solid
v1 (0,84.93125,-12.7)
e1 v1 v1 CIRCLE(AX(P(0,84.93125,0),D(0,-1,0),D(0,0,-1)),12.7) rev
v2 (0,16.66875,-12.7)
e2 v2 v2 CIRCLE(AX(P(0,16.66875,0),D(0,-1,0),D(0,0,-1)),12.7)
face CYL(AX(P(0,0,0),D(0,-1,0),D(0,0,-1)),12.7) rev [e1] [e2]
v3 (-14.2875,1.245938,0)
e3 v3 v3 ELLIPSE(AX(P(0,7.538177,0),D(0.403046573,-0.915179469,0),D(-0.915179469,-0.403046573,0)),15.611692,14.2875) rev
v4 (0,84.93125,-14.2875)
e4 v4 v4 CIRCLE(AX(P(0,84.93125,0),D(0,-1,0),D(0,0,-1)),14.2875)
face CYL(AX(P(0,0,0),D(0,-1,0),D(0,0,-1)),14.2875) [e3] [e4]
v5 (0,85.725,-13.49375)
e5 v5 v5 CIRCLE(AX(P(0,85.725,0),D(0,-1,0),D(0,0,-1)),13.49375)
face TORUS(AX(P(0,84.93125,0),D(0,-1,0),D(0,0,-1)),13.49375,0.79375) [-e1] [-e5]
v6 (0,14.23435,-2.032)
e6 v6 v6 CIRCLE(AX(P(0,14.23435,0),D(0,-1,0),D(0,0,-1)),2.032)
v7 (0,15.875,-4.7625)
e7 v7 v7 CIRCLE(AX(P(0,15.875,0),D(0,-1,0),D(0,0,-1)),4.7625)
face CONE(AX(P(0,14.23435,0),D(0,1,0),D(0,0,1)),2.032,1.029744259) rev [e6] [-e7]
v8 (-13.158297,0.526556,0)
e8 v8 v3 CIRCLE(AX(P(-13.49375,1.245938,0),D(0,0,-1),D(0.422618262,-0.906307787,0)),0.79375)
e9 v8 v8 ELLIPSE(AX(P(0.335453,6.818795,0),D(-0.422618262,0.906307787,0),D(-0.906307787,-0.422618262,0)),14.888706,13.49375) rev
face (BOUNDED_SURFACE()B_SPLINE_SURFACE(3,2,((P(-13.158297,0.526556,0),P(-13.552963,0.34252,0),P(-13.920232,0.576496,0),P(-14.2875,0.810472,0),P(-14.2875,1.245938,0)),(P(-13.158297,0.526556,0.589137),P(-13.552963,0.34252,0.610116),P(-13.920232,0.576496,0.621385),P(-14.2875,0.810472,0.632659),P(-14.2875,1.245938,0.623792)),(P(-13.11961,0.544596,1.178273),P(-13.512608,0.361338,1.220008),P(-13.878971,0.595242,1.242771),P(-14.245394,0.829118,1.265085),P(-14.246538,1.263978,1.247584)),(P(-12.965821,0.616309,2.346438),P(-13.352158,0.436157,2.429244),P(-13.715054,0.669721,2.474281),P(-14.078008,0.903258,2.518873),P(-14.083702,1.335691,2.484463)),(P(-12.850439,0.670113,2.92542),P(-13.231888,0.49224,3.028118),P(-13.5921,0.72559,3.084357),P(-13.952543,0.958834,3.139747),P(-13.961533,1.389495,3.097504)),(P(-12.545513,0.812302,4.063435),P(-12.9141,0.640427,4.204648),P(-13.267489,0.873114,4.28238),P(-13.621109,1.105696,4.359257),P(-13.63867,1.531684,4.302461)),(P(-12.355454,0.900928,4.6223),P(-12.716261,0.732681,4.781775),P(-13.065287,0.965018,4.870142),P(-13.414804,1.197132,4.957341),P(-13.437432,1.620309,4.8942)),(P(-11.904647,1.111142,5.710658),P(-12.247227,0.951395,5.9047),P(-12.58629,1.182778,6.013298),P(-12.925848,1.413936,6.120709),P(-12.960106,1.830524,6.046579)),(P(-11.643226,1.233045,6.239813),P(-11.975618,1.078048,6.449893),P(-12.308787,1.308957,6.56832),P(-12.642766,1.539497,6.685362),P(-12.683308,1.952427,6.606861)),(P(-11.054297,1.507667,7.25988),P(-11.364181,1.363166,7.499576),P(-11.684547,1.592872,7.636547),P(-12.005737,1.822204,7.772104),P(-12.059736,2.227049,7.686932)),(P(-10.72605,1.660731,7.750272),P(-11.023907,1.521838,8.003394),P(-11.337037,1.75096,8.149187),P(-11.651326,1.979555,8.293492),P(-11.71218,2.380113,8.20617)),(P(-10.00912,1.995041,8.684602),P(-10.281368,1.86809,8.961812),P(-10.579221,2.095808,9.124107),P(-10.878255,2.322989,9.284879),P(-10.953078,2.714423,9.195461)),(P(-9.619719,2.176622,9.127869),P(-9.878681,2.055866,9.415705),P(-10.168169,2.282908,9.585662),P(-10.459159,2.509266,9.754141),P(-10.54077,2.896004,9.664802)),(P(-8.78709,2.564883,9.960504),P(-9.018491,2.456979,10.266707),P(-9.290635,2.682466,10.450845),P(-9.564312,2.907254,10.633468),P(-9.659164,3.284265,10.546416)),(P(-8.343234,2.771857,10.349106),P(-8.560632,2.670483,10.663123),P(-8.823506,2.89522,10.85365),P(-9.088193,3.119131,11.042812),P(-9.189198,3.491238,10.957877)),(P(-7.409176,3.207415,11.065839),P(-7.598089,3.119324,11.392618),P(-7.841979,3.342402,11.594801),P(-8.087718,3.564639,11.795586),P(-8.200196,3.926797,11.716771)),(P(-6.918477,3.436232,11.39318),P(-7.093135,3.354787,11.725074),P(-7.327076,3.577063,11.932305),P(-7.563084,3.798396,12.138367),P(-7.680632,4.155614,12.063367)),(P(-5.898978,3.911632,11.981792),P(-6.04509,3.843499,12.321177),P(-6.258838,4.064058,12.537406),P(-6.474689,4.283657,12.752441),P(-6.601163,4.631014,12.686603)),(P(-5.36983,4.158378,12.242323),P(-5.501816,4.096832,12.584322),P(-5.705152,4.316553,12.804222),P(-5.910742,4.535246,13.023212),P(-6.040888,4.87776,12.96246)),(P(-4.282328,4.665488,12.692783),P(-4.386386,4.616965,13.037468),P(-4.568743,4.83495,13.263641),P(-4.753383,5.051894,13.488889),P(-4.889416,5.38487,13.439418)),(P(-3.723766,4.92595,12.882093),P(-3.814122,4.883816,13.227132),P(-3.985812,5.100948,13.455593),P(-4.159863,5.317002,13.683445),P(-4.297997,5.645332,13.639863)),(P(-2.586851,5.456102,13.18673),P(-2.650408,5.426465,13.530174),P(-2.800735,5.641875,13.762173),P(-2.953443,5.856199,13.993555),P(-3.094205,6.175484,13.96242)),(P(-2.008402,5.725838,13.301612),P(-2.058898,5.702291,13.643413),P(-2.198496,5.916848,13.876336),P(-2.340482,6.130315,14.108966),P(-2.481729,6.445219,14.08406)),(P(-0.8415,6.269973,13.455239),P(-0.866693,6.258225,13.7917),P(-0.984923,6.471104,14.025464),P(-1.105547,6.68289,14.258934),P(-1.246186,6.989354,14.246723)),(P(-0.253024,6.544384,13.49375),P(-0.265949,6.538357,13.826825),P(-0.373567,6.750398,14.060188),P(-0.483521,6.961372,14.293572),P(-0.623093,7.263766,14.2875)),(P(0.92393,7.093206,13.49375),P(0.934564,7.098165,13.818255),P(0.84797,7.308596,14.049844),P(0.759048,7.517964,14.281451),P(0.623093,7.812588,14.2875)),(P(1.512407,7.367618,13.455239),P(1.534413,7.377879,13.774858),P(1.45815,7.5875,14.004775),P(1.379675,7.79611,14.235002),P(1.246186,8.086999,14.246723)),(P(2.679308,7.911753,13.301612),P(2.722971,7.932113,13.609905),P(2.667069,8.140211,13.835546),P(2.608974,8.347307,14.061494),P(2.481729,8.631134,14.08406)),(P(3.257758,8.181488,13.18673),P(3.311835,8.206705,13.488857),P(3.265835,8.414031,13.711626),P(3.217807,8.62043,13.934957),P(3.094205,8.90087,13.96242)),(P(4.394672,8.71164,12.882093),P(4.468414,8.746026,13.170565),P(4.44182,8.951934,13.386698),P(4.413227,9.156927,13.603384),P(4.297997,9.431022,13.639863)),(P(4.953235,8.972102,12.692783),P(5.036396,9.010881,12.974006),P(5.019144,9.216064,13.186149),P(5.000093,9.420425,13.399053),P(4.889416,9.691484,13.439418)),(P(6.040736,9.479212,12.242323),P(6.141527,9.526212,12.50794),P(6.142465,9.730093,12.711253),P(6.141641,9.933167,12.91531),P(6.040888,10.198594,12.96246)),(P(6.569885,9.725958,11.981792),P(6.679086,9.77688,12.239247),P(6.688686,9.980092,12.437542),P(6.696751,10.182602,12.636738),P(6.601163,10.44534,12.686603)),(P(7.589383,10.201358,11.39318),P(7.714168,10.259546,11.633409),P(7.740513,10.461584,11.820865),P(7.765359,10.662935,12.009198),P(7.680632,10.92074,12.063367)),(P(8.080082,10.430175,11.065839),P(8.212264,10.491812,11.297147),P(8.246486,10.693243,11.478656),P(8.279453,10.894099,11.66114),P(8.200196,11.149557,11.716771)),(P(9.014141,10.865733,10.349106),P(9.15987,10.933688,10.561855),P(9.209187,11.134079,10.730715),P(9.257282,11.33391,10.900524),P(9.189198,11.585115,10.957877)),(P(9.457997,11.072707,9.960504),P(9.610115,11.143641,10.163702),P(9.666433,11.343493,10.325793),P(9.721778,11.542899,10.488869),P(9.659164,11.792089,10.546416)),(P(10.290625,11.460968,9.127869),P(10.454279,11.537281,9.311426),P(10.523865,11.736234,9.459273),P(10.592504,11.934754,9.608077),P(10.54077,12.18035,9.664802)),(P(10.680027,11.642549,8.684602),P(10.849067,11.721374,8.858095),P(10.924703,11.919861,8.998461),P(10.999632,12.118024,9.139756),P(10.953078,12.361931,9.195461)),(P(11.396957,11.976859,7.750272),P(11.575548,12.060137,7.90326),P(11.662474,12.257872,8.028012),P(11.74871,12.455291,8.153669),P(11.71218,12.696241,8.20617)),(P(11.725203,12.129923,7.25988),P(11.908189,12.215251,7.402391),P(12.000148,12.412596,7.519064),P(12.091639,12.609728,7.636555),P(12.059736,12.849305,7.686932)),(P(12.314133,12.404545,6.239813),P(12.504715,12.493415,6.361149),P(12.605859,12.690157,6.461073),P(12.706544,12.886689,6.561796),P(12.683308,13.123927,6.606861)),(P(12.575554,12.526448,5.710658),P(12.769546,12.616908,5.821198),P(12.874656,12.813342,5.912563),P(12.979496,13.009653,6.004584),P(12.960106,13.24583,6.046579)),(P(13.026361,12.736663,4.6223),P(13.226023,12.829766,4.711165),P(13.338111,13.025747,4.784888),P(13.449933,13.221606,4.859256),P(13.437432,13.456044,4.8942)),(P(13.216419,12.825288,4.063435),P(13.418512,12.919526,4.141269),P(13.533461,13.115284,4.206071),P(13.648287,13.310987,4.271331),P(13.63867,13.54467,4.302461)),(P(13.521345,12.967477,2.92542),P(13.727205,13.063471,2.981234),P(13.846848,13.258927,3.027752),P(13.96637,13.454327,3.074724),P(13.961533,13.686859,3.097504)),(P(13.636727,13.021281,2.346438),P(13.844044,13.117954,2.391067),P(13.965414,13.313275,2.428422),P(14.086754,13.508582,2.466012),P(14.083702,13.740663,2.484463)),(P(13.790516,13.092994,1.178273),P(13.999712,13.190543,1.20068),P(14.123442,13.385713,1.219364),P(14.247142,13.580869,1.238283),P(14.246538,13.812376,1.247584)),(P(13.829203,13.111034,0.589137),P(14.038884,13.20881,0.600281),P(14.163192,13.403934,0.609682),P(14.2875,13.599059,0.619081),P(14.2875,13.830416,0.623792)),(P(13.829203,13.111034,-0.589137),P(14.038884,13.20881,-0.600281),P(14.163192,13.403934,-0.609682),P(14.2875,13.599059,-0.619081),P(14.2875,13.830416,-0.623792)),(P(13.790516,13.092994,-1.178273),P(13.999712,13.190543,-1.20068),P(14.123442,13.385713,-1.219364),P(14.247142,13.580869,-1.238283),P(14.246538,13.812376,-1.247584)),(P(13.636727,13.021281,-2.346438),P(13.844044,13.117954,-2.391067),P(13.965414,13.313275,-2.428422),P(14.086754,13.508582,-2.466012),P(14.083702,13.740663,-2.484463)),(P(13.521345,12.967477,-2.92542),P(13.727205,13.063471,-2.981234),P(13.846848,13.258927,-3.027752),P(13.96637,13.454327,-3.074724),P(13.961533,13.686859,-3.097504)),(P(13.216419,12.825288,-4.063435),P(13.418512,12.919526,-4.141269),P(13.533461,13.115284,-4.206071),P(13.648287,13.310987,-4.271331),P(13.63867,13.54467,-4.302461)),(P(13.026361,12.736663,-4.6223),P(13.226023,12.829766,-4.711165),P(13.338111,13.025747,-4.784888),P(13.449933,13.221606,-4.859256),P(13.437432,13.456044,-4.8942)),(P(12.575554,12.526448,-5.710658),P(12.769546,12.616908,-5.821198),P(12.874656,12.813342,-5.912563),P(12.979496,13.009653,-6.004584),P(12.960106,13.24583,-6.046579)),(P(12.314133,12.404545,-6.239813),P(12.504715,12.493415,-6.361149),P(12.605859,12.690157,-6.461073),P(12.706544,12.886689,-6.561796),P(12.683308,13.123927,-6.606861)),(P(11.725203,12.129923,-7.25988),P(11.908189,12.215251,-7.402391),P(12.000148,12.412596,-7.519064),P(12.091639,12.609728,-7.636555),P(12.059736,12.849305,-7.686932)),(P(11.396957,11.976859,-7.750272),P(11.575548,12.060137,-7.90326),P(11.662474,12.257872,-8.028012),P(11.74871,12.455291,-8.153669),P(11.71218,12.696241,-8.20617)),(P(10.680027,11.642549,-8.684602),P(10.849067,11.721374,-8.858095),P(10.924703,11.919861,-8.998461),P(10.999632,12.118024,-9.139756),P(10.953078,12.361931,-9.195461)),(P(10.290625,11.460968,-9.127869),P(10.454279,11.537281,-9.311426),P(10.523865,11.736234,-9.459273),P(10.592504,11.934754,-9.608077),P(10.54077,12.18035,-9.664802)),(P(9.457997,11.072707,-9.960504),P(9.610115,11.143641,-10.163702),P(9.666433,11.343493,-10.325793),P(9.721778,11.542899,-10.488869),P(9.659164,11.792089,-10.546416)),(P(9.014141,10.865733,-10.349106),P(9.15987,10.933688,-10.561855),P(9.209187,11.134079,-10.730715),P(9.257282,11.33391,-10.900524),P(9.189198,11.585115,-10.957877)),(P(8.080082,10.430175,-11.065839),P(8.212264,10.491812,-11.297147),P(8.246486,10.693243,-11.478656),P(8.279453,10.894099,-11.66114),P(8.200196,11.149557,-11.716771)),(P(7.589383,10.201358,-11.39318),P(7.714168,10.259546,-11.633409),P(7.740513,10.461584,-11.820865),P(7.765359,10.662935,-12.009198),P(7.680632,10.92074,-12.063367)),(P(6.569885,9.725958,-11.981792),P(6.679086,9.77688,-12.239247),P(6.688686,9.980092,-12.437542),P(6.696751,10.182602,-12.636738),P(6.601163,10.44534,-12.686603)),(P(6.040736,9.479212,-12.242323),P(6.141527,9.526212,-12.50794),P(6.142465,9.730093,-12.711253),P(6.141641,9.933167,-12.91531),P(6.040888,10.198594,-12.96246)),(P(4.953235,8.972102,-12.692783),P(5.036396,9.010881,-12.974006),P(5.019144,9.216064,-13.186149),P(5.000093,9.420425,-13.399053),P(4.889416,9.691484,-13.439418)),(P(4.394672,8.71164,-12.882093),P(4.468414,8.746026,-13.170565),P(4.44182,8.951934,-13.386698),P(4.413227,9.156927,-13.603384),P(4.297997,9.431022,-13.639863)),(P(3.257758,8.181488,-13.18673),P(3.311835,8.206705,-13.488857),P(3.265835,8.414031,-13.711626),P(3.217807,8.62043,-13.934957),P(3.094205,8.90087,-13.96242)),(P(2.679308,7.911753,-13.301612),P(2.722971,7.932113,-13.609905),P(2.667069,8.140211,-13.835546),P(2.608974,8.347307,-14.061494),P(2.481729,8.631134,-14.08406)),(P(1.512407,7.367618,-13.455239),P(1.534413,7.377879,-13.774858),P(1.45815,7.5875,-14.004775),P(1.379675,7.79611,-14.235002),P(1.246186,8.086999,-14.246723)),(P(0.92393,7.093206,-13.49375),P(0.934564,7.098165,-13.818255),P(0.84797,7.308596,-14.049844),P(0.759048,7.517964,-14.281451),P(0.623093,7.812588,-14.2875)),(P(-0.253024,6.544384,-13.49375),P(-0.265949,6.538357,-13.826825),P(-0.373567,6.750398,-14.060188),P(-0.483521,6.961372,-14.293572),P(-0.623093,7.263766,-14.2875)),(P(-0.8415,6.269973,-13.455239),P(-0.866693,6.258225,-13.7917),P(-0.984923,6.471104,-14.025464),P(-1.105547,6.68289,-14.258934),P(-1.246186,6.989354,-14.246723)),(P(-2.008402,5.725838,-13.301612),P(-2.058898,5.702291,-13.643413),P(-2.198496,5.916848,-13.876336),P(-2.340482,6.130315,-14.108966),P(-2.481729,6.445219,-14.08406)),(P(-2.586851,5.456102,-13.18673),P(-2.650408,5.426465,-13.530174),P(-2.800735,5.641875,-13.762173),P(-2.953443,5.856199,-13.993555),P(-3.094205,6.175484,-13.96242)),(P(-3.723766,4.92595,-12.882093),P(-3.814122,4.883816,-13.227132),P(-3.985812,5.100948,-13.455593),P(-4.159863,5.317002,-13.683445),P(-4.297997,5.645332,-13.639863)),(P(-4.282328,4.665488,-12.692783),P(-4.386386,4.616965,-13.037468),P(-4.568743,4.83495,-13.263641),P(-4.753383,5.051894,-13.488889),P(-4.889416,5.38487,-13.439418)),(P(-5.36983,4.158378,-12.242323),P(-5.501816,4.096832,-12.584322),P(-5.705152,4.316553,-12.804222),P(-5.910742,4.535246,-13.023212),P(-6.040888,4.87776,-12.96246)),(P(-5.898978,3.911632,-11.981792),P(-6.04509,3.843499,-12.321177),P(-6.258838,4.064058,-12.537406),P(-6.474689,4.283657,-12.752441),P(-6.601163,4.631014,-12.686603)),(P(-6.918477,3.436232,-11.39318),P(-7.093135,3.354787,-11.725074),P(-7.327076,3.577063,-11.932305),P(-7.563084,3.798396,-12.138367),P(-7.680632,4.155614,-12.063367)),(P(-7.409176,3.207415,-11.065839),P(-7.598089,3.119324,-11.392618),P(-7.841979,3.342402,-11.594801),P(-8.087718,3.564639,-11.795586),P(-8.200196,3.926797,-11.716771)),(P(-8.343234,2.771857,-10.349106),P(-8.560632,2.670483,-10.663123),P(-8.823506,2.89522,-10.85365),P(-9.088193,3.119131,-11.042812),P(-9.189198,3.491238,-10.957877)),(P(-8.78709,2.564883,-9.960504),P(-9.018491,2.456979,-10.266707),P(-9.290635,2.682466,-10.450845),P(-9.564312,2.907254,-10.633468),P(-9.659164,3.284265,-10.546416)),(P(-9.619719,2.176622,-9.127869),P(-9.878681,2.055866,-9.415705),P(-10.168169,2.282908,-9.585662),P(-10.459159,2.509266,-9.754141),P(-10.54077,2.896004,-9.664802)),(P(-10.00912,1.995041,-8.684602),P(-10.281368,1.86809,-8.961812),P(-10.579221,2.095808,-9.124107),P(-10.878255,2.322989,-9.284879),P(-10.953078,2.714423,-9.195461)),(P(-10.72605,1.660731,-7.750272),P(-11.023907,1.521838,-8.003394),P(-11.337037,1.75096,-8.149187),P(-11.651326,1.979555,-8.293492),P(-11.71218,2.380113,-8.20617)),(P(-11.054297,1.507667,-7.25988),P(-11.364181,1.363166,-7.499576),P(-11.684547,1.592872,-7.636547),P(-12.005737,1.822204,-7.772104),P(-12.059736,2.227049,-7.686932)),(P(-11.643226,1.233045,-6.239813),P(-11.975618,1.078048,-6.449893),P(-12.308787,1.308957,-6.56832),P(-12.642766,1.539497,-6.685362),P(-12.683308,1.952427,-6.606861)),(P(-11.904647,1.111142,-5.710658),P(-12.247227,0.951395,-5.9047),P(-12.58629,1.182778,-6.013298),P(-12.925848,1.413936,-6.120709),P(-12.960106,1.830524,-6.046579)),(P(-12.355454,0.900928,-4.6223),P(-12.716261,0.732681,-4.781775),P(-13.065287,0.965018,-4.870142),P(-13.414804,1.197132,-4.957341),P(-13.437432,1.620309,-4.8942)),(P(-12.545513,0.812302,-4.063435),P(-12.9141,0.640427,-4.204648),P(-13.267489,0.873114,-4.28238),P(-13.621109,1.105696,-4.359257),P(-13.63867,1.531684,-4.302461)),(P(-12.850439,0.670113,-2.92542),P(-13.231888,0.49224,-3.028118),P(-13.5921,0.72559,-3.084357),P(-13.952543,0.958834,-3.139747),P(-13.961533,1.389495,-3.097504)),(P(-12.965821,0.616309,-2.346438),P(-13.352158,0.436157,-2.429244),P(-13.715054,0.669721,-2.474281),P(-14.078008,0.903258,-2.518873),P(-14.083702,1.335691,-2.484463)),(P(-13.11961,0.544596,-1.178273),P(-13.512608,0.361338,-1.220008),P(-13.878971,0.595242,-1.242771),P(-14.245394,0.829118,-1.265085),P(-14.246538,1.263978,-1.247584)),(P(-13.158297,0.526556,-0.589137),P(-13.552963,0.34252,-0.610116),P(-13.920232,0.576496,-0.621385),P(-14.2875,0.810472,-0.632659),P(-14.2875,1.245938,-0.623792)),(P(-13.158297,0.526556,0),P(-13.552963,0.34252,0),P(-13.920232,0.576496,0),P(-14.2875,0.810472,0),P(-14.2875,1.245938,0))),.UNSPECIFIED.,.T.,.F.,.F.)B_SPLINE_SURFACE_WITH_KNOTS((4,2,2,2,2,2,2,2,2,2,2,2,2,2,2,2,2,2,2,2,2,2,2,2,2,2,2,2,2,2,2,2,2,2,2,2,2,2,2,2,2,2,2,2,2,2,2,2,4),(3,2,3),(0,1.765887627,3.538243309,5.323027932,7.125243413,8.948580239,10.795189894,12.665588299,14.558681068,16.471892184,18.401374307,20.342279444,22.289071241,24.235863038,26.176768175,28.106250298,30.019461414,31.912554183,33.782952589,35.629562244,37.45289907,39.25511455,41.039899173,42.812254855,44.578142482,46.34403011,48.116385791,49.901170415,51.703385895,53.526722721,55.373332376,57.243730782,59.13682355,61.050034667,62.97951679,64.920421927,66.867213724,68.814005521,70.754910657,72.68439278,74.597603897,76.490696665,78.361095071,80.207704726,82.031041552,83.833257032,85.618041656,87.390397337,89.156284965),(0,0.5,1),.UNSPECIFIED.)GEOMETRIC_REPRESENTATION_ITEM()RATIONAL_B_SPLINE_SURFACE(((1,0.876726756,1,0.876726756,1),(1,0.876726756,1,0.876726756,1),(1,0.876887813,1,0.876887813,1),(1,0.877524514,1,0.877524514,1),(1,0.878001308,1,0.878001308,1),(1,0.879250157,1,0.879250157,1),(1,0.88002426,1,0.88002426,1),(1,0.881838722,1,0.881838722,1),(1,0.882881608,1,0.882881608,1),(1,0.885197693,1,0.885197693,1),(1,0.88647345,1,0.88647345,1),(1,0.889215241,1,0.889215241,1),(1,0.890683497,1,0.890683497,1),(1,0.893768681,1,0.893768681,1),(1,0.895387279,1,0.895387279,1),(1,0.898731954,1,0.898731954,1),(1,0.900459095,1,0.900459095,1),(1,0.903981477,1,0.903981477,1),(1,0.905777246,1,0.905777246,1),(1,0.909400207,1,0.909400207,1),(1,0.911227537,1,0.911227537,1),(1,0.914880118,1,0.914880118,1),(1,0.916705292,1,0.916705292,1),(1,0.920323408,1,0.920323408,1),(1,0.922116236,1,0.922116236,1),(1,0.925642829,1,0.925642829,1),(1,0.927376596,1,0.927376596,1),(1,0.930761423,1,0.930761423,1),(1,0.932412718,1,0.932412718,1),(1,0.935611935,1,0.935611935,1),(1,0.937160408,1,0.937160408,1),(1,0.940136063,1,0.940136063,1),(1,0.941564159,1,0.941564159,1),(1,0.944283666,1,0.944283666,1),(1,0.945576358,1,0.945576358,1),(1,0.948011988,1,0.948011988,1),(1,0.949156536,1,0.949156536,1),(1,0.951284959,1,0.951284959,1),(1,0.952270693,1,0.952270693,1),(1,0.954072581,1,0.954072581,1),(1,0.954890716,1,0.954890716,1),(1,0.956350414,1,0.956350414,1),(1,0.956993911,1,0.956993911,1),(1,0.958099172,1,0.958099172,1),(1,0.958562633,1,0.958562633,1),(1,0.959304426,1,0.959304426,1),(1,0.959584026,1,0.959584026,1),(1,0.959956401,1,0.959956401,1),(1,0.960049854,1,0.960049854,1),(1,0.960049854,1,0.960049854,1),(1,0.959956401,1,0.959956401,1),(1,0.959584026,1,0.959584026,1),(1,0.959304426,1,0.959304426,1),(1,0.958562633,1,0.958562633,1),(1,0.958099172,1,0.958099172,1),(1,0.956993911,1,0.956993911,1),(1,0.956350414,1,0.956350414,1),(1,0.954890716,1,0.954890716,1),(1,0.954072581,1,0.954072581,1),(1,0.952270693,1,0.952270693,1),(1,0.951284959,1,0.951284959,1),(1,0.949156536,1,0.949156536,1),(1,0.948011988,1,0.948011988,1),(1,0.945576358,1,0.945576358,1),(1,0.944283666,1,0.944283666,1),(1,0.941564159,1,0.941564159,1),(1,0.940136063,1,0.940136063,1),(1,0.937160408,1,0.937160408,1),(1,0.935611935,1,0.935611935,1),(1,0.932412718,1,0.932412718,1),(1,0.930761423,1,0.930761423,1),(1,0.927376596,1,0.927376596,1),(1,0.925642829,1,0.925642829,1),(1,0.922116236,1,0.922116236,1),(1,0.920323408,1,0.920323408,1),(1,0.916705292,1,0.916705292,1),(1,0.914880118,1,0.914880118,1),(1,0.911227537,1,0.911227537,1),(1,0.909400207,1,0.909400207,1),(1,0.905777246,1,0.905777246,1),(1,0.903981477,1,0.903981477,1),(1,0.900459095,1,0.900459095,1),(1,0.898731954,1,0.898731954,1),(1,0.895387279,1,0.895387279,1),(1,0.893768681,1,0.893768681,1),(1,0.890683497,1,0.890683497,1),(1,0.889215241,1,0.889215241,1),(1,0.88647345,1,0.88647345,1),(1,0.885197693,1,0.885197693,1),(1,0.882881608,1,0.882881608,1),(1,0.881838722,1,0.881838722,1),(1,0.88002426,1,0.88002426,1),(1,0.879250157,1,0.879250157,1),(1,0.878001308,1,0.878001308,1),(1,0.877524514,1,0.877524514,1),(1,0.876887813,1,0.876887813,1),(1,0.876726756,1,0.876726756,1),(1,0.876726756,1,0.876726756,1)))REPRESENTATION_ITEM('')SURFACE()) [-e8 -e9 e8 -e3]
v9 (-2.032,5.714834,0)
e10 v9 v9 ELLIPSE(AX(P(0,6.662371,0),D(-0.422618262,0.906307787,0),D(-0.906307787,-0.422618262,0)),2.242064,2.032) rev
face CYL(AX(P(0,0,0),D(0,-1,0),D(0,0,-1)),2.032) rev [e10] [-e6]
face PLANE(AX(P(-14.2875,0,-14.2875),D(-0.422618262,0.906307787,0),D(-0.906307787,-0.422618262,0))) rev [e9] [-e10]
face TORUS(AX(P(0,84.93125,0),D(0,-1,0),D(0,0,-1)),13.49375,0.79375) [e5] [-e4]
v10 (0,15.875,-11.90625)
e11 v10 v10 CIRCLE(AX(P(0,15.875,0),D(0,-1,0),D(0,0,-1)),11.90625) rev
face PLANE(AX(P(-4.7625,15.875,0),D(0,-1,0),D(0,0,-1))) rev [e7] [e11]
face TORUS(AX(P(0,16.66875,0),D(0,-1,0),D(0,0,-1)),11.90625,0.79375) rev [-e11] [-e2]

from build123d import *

# Parameters (mm, degrees)
CUT_EXTRUDE1_DEPTH      = 89.074065067
CUT_EXTRUDE1_DEPTH_BACK = 89.074065067
FILLET1_R               = 0.79375


with BuildPart() as part:
    # Sketch1 → Revolve1 (revolve)
    with BuildSketch(Plane.XY, mode=Mode.PRIVATE) as revolve1_sk:
        Polygon((-2.032, 0), (-2.032, 14.23435008), (-4.7625, 15.875), (-12.7, 15.875), (-12.7, 85.725), (-14.2875, 85.725), (-14.2875, 0), align=None)
    revolve(revolve1_sk.sketch.rotate(Axis((0, 0, 0), (0, 1, 0)), 270), axis=Axis((0, 0, 0), (0, 1, 0)))

    # Sketch2 → Cut-Extrude1 (cut, two sides: drawn at the far end of the back side and taken through both)
    with BuildSketch(Plane.XY.offset(-CUT_EXTRUDE1_DEPTH_BACK)):
        Polygon((-14.2875, 0), (14.2875, 13.324741332), (14.2875, 0), align=None)
    extrude(amount=CUT_EXTRUDE1_DEPTH + CUT_EXTRUDE1_DEPTH_BACK, mode=Mode.SUBTRACT)

    # Fillet1
    fillet1_edges = [part.edges().sort_by_distance(p)[0] for p in [
        (-10.102788136, 1.951363189, -10.102788136),
        (0, 85.725, 14.2875),
        (0, 85.725, 12.7),
        (0, 15.875, 12.7),
    ]]
    fillet(fillet1_edges, radius=FILLET1_R - 0.0001)  # a hair under: the kernel refuses the full size


solid = part.part
